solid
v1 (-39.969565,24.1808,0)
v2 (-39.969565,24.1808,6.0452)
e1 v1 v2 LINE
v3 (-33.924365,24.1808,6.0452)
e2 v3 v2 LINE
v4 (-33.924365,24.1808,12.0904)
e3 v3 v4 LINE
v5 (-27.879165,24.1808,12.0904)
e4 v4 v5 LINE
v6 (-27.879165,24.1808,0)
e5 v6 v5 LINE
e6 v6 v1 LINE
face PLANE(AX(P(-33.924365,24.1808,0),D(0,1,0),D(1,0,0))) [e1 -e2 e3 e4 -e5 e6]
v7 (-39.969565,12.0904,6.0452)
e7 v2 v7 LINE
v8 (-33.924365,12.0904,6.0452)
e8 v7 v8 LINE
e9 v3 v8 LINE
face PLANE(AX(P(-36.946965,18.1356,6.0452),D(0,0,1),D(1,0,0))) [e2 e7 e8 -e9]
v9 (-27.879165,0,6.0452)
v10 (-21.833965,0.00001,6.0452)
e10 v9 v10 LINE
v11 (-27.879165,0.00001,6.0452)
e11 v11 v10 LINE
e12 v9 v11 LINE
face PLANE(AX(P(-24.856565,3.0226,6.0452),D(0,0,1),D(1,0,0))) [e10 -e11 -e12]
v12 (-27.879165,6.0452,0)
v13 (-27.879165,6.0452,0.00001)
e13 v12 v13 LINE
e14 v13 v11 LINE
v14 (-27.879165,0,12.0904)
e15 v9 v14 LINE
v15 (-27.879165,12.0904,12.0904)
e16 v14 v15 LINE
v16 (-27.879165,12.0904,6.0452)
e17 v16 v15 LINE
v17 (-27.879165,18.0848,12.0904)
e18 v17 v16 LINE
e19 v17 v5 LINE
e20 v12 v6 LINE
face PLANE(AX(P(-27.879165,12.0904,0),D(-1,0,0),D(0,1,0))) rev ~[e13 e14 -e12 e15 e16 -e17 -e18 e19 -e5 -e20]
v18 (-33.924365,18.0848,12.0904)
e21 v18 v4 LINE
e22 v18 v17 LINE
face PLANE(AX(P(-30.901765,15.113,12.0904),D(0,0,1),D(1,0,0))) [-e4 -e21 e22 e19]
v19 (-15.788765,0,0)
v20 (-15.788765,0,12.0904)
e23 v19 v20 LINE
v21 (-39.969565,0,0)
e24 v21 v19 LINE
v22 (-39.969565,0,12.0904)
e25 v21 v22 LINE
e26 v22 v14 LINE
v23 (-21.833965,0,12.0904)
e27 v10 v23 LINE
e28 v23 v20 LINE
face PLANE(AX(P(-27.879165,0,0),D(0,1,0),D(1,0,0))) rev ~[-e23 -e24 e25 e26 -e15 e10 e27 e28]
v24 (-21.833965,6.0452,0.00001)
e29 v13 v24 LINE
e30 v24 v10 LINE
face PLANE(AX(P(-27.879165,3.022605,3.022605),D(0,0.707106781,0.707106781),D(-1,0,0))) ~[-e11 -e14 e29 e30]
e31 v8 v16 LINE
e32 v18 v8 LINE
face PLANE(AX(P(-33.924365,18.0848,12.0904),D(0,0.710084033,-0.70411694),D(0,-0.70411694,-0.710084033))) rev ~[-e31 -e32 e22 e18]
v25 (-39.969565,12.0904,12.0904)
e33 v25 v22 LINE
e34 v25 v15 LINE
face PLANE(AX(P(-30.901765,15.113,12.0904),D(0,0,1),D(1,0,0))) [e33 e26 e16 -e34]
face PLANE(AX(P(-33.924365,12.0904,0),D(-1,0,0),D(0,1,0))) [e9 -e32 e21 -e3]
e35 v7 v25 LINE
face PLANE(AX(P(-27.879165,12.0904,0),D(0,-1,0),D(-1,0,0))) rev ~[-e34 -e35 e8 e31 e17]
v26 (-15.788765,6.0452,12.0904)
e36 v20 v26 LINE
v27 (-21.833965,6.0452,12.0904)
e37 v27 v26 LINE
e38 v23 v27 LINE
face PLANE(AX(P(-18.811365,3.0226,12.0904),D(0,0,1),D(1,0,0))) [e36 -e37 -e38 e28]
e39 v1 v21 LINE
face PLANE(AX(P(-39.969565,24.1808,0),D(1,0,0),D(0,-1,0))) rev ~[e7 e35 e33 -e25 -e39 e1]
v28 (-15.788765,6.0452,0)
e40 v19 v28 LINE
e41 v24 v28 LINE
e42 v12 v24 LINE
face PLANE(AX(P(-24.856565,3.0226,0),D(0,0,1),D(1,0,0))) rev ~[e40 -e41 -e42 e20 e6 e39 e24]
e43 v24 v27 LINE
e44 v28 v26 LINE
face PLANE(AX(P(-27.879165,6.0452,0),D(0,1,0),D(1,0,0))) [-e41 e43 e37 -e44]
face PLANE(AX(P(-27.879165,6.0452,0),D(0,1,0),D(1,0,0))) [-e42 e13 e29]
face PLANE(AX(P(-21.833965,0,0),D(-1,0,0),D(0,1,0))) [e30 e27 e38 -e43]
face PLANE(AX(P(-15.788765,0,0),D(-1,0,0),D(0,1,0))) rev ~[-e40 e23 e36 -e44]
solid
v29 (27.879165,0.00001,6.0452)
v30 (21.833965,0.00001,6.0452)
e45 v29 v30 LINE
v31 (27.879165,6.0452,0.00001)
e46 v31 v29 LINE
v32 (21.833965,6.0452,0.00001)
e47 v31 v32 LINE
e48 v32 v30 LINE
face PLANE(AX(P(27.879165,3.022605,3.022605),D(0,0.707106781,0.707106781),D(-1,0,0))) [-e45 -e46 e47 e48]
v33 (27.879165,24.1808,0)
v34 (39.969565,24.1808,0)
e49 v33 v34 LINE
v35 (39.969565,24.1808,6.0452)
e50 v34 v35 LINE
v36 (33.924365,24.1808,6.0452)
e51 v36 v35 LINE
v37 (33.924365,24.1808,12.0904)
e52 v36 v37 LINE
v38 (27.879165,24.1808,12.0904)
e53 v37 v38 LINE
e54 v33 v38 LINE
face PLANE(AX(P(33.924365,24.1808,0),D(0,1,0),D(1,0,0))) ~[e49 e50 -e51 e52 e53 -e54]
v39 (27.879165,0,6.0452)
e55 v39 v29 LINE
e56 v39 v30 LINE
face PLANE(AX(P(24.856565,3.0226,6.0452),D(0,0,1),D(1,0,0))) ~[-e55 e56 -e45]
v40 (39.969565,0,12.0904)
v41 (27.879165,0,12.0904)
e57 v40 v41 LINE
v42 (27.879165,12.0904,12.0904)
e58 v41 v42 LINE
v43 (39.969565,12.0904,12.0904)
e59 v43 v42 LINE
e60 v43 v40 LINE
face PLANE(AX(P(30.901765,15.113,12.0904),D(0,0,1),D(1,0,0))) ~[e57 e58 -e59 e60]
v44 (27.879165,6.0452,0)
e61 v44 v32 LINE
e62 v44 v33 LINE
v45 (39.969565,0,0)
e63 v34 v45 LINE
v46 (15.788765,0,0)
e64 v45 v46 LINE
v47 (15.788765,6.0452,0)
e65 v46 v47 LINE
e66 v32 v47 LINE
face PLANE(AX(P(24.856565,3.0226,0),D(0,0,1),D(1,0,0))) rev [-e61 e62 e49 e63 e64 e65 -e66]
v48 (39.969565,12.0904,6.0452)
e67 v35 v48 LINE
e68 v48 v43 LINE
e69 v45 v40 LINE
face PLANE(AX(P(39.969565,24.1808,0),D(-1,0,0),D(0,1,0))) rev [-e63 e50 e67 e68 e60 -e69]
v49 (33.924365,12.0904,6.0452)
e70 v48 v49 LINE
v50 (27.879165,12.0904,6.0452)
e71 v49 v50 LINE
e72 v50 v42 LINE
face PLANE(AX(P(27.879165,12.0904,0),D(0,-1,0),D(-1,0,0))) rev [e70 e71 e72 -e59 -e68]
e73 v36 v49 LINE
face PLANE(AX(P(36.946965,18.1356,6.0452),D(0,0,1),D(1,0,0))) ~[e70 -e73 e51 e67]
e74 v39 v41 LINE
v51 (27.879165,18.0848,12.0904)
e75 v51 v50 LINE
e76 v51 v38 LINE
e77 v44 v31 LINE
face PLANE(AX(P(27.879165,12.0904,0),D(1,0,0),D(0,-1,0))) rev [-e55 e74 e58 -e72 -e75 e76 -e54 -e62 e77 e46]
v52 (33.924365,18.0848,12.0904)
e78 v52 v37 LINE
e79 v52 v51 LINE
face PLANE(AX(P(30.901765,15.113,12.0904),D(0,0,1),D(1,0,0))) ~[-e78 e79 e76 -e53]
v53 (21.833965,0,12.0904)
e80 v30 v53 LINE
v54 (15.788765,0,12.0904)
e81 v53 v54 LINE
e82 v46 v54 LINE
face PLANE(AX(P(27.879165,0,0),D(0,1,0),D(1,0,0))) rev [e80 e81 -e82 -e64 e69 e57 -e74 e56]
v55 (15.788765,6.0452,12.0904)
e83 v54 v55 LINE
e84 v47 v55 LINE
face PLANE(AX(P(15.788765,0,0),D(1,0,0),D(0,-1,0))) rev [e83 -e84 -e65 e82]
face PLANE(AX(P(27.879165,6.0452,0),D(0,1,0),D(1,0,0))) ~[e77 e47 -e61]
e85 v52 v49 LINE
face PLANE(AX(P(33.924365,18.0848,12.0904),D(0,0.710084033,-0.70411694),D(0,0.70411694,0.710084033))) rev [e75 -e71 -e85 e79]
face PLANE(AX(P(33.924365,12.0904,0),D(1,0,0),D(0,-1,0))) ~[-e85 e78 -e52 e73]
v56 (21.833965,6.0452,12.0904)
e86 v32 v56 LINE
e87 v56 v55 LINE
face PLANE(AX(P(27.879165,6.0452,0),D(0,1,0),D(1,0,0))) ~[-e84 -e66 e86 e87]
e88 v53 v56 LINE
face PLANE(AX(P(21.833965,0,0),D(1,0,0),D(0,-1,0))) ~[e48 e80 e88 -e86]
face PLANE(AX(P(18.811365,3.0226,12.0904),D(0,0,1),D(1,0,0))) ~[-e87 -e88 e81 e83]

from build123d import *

# Parameters (mm, degrees)
F1_DEPTH  = 12.0904
F2_DEPTH  = 6.0452
F0_W      = 6.0452
F0_H      = 6.0452
F3_DEPTH  = 12.0904
F4_DEPTH  = 12.0904
F5_DEPTH  = 6.0452
F6_SIZE   = 6.04519
F7_DEPTH  = 12.0904
F8_DEPTH  = 12.0904
F11_DEPTH = 6.0452


# Not quite as in the source:
# - a fillet or chamfer is up to 0.001 mm smaller than in the source, because OpenCascade refuses the exact size


with BuildPart() as f1:
    # F0 (on Top) → F1 (new body)
    with BuildSketch(Plane.XY):
        Polygon((-39.9695653213, 0), (-27.8791653213, 0), (-27.8791653213, 6.0452), (-27.8791653213, 12.0904), (-33.9243653213, 12.0904), (-39.9695653213, 12.0904), align=None)
    extrude(amount=F1_DEPTH)

    # F0 (on Top) → F2 (join)
    with BuildSketch(Plane.XY):
        Polygon((-39.9695653213, 24.1808), (-39.9695653213, 12.0904), (-33.9243653213, 12.0904), (-33.9243653213, 18.1356), (-33.9243653213, 24.1808), align=None)
    extrude(amount=F2_DEPTH)

    # F0 (on Top) → F3 (join)
    with BuildSketch(Plane.XY):
        with Locations((-30.9017653213, 21.1582)):
            Rectangle(F0_W, F0_H)
    extrude(amount=F3_DEPTH)



with BuildPart() as f4:
    # F0 (on Top) → F4 (new body)
    with BuildSketch(Plane.XY):
        with Locations((-18.8113653213, 3.0226)):
            Rectangle(F0_W, F0_H)
    extrude(amount=F4_DEPTH)


with BuildPart() as f1_1:
    add(f1.part)

    add(f4.part)  # F5 merges F4
    # F0 (on Top) → F5 (join)
    with BuildSketch(Plane.XY):
        with Locations((-24.8565653213, 3.0226)):
            Rectangle(F0_W, F0_H)
    extrude(amount=F5_DEPTH)

    # F6 (size 6.0452 in the source; OpenCascade refuses exactly that, so slightly less here)
    f6_edges = [f1_1.edges().sort_by_distance(p)[0] for p in [
        (-24.856565, 6.0452, 6.0452),
    ]]
    chamfer(f6_edges, length=F6_SIZE)

    # F0 (on Top) → F7 (join)
    with BuildSketch(Plane.XY):
        with Locations((-18.8113653213, 3.0226)):
            Rectangle(F0_W, F0_H)
    extrude(amount=F7_DEPTH)

    # F0 (on Top) → F8 (join)
    with BuildSketch(Plane.XY):
        with Locations((-30.9017653213, 15.113)):
            Rectangle(F0_W, F0_H)
    extrude(amount=F8_DEPTH)

    # F10 (on face) → F11 (cut, through all)
    with BuildSketch(Plane(origin=(-33.9243653213, 0, 0), x_dir=(0, -1, 0), z_dir=(-1, 0, 0))):
        Polygon((-12.0904, 12.0904), (-18.0848, 12.0904), (-12.0904, 6.0452), align=None)
    extrude(amount=-F11_DEPTH, mode=Mode.SUBTRACT)


with BuildPart() as f12_1:
    # F12: instance of F1
    add(f1_1.part.mirror(Plane.YZ))


solid = Compound([f1_1.part, f12_1.part])
